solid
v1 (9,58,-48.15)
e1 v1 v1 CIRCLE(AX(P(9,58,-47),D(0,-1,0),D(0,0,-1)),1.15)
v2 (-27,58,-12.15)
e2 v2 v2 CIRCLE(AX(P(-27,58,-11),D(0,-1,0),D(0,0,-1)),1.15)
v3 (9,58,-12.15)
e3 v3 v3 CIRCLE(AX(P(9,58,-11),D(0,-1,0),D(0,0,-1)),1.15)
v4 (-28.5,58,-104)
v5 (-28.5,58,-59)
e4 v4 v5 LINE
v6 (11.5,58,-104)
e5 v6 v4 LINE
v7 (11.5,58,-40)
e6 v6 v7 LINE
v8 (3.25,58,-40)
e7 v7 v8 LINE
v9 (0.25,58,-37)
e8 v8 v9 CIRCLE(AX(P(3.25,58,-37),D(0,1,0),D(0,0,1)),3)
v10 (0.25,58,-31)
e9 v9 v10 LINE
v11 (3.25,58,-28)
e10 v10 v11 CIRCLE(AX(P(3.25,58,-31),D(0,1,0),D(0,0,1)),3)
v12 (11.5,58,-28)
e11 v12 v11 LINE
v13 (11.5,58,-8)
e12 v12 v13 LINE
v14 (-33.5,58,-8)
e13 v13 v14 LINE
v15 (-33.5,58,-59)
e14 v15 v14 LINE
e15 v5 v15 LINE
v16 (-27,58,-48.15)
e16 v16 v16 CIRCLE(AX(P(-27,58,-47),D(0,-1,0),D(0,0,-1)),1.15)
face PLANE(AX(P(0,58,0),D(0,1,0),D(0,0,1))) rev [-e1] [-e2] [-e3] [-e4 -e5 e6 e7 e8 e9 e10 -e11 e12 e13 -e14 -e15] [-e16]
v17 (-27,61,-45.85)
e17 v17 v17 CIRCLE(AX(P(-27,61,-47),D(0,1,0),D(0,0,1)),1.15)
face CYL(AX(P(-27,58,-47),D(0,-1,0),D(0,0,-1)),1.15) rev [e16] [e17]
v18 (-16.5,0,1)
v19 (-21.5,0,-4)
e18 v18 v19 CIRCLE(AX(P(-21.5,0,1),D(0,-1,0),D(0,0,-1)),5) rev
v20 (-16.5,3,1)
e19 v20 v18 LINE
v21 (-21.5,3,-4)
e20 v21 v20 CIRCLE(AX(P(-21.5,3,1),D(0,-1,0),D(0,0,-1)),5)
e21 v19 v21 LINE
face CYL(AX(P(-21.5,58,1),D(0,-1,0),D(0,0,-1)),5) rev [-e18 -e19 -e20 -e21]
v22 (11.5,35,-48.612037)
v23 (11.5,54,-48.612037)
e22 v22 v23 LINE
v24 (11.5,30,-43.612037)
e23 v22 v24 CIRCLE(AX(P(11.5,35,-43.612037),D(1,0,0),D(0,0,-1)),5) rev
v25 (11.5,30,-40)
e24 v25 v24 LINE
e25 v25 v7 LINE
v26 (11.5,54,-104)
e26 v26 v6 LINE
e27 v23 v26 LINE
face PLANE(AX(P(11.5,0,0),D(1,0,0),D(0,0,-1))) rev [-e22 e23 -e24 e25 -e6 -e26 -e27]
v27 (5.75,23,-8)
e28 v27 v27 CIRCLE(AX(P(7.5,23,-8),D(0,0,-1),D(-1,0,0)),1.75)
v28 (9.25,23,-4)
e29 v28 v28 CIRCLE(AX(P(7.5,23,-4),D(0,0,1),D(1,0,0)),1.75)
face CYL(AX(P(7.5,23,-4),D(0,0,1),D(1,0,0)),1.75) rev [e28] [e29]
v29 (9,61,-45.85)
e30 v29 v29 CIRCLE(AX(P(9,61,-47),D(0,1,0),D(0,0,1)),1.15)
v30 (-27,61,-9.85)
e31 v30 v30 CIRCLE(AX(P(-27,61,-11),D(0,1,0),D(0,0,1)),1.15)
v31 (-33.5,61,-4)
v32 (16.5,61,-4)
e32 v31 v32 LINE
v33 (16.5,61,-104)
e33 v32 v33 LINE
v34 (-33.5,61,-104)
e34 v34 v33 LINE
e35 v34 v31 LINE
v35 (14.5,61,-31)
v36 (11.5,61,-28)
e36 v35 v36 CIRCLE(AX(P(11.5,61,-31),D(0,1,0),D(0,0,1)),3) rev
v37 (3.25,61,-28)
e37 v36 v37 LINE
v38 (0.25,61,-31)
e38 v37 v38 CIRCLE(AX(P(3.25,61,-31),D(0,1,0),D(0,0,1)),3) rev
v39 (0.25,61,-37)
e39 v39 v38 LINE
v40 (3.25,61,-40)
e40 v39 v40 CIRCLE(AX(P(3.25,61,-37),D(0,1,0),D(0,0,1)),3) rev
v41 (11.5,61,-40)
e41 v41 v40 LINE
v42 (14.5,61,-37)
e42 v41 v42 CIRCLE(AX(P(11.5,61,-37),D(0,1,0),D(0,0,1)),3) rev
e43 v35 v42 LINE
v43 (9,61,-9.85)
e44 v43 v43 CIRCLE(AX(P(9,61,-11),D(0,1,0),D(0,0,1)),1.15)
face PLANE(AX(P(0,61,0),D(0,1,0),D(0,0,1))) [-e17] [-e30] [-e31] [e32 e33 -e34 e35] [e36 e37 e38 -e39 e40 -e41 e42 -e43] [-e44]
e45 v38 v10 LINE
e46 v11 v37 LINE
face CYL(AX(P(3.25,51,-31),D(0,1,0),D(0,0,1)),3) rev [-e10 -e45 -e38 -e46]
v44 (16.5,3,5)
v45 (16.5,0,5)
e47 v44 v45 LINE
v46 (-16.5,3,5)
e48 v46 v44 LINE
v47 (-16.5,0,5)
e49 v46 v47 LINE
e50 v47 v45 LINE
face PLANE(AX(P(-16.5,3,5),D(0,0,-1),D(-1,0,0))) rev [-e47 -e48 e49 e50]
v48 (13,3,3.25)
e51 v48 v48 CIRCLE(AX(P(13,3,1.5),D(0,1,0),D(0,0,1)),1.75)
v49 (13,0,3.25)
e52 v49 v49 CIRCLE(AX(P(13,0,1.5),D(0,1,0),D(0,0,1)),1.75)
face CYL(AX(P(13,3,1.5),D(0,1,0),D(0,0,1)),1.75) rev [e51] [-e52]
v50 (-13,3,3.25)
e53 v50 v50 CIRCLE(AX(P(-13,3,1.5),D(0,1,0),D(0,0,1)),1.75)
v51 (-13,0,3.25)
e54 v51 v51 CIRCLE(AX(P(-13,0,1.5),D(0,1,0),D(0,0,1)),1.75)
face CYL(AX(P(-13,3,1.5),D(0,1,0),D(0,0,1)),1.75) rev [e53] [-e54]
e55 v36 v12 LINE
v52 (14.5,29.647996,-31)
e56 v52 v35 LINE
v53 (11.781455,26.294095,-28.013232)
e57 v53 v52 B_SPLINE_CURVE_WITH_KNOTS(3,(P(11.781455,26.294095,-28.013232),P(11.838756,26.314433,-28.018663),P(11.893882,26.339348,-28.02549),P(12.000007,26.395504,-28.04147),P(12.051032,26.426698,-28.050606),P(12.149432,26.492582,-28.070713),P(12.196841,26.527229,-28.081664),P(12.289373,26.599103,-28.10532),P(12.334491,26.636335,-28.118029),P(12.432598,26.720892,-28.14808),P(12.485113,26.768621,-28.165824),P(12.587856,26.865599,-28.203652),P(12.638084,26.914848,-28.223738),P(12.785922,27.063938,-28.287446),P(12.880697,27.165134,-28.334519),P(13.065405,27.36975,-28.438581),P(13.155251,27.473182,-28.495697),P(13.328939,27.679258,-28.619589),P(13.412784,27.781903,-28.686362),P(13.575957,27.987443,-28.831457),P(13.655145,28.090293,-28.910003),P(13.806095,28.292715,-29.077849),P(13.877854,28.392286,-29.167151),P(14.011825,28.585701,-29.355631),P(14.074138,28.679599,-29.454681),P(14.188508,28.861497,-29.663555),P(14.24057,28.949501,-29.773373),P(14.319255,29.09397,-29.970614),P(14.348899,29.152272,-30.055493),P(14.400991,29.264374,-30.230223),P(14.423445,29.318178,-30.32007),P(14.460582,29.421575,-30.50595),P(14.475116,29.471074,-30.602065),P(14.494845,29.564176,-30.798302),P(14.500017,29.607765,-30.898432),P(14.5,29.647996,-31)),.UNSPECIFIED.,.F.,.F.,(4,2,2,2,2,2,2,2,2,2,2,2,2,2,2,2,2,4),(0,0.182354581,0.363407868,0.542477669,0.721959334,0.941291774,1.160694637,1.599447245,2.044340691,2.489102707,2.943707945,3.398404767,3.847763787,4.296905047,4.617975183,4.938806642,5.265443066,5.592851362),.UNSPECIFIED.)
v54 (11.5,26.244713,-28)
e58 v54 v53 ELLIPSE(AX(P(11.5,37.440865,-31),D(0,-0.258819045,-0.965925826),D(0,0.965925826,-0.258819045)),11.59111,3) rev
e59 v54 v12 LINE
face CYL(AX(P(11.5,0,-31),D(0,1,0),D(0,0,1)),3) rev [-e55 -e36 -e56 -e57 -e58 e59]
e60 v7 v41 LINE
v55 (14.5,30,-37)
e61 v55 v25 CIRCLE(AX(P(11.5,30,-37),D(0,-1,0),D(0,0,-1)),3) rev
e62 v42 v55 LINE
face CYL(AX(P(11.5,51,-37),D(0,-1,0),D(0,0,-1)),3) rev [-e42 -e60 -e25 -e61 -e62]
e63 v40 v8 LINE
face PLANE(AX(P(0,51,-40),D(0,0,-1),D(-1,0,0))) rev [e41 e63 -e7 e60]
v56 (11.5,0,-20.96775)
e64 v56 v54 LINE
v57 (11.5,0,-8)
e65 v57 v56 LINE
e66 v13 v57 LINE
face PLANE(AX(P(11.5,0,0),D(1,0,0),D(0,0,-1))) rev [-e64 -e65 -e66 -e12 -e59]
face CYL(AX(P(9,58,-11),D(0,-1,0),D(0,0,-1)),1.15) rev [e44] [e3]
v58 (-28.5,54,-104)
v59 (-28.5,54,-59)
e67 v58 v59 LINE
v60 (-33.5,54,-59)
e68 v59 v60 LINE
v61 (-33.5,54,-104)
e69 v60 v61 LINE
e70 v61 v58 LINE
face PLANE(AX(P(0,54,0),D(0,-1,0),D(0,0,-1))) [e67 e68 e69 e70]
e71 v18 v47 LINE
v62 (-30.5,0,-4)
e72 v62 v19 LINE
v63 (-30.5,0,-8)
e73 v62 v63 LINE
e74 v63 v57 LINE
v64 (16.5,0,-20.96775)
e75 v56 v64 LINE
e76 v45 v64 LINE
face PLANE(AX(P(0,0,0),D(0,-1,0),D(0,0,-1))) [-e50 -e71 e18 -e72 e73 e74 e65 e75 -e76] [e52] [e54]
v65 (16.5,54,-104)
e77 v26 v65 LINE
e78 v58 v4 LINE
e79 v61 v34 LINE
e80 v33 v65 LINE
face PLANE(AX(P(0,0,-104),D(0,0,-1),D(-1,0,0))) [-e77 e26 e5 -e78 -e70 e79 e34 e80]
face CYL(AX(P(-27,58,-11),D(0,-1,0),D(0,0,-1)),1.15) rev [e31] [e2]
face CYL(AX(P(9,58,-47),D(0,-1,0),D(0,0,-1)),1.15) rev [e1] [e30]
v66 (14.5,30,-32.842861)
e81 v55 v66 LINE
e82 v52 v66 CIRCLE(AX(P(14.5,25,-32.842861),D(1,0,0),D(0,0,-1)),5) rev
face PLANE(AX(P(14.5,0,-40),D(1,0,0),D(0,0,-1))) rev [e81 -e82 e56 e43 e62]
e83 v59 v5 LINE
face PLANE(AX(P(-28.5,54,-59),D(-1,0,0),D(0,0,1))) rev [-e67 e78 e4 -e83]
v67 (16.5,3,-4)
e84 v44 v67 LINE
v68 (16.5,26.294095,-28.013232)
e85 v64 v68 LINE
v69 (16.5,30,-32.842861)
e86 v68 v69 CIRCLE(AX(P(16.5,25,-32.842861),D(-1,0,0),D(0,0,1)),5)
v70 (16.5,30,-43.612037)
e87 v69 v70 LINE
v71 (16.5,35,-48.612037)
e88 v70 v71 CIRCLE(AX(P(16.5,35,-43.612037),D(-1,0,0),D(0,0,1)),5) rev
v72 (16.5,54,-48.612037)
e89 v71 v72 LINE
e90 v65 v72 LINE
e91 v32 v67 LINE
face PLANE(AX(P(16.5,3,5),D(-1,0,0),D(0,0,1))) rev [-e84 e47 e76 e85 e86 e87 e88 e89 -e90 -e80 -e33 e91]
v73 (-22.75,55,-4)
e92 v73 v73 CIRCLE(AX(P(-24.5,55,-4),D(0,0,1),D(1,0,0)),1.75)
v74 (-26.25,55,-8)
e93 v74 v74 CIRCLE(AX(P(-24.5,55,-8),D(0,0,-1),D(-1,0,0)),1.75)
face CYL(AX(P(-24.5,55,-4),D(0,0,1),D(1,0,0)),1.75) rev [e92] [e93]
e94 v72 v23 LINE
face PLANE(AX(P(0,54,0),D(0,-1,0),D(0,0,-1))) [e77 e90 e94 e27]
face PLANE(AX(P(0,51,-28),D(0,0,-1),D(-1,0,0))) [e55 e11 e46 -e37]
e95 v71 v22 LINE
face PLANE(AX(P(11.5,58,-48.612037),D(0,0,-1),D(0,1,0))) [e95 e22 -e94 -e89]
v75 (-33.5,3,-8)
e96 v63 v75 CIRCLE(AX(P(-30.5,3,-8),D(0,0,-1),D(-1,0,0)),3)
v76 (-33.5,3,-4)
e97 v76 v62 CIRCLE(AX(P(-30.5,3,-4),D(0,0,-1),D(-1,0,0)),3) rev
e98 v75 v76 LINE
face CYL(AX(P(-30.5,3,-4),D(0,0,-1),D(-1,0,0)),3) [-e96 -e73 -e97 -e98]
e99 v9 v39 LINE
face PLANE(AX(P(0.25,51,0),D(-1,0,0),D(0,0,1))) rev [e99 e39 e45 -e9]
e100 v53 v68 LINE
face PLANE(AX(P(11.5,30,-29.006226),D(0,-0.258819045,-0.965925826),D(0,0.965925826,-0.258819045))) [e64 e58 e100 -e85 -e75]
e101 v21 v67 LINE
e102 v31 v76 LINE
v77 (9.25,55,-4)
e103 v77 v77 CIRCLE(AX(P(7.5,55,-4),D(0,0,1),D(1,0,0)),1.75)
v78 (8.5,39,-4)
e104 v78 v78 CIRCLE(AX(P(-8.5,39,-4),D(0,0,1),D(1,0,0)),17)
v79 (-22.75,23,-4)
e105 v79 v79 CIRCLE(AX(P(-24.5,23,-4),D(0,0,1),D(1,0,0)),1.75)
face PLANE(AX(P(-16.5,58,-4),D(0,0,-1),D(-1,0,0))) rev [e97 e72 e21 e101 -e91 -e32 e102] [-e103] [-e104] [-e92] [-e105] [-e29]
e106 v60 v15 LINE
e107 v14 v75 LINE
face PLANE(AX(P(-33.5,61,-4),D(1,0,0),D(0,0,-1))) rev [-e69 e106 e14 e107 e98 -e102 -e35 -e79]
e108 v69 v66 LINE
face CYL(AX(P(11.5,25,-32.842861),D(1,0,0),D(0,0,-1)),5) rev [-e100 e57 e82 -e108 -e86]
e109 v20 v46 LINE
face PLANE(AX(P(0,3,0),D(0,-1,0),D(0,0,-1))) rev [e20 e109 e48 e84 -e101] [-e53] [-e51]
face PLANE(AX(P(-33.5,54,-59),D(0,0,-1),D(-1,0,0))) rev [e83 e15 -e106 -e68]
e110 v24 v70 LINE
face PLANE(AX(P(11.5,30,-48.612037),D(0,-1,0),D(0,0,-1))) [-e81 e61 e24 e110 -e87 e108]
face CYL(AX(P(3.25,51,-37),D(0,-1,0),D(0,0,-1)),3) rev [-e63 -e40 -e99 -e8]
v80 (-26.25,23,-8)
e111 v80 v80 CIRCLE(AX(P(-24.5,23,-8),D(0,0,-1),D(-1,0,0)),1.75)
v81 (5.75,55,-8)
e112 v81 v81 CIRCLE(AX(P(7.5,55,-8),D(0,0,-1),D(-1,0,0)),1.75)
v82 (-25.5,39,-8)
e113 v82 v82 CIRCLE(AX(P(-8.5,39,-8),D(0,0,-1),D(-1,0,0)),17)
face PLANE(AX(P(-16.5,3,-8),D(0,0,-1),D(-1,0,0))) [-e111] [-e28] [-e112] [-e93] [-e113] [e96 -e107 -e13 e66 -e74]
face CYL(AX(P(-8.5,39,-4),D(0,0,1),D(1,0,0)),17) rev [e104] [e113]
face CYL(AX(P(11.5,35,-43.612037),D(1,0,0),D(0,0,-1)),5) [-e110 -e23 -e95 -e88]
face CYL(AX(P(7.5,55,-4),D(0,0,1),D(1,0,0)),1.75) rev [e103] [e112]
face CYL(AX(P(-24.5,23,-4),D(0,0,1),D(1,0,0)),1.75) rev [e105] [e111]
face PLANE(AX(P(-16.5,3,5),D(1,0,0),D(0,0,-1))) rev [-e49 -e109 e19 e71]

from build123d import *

# Parameters (mm, degrees)
SKETCH_1_W          = 33
SKETCH_1_H          = 10
EXTRUDE_1_DEPTH     = 3
HOLE_WIZARD_1_D     = 3.5
SKETCH_5_W          = 33
SKETCH_5_H          = 3
EXTRUDE_2_DEPTH     = 3
SKETCH_6_W          = 33
SKETCH_6_H          = 4
EXTRUDE_3_DEPTH     = 55
SKETCH_7_W          = 50
SKETCH_7_H          = 4
EXTRUDE_4_DEPTH     = 3
SKETCH_8_W          = 50
SKETCH_8_H          = 3
EXTRUDE_5_DEPTH     = 56
EXTRUDE_6_DEPTH     = 5
EXTRUDE_7_DEPTH     = 4
SKETCH_20_W         = 50
SKETCH_20_H         = 3
EXTRUDE_9_DEPTH     = 40
EXTRUDE_15_DEPTH    = 4
EXTRUDE_16_DEPTH    = 4
FILLET_1_R          = 3
HOLE_WIZARD_5_D     = 3.5
HOLE_WIZARD_6_D     = 34
HOLE_WIZARD_7_D     = 2.3
EXTRUDE_17_DEPTH    = 5
SKETCH_49_W         = 44.612037216
SKETCH_49_H         = 28
EXTRUDE_18_DEPTH    = 5
SKETCH_50_W         = 11.25
SKETCH_50_H         = 12
CUT_EXTRUDE_1_DEPTH = 10
EXTRUDE_19_DEPTH    = 5
FILLET_2_R          = 5
SKETCH_52_W         = 3
SKETCH_52_H         = 12
CUT_EXTRUDE_2_DEPTH = 126.136925006
FILLET_3_R          = 3
FILLET_4_R          = 5
SKETCH_53_W         = 5
SKETCH_53_H         = 55.387962784
SKETCH_53_H_2       = 45
EXTRUDE_20_DEPTH    = 4


with BuildPart() as part:
    # 草图1 → 凸台-拉伸1 (new body)
    with BuildSketch(Plane(origin=(0, 0, 0), x_dir=(1, 0, 0), z_dir=(0, 1, 0))):
        Rectangle(SKETCH_1_W, SKETCH_1_H)
    extrude(amount=EXTRUDE_1_DEPTH)

    # 孔1 (through all)
    with Locations(Plane(origin=(0, 3, 0), x_dir=(1, 0, 0), z_dir=(0, 1, 0))):
        with Locations((-13, -1.5), (13, -1.5)):
            Hole(HOLE_WIZARD_1_D / 2)

    # 草图5 → 凸台-拉伸2 (add)
    with BuildSketch(Plane.XZ):
        with Locations((0, -6.5)):
            Rectangle(SKETCH_5_W, SKETCH_5_H)
    extrude(amount=-EXTRUDE_2_DEPTH)

    # 草图6 → 凸台-拉伸3 (add)
    with BuildSketch(Plane(origin=(0, 3, 0), x_dir=(1, 0, 0), z_dir=(0, 1, 0))):
        with Locations((0, 6)):
            Rectangle(SKETCH_6_W, SKETCH_6_H)
    extrude(amount=EXTRUDE_3_DEPTH)

    # 草图7 → 凸台-拉伸4 (add)
    with BuildSketch(Plane(origin=(0, 58, 0), x_dir=(1, 0, 0), z_dir=(0, 1, 0))):
        with Locations((-8.5, 6)):
            Rectangle(SKETCH_7_W, SKETCH_7_H)
    extrude(amount=EXTRUDE_4_DEPTH)

    # 草图8 → 凸台-拉伸5 (add)
    with BuildSketch(Plane(origin=(0, 0, -8), x_dir=(-1, 0, 0), z_dir=(0, 0, -1))):
        with Locations((8.5, 59.5)):
            Rectangle(SKETCH_8_W, SKETCH_8_H)
    extrude(amount=EXTRUDE_5_DEPTH)

    # 草图15 → 凸台-拉伸6 (add)
    with BuildSketch(Plane(origin=(16.5, 0, 0), x_dir=(0, 0, -1), z_dir=(1, 0, 0))):
        Polygon((8, 0), (48.612037216, 58), (42.508164272, 58), (8, 8.717233978), align=None)
    extrude(amount=-EXTRUDE_6_DEPTH)

    # 草图16 → 凸台-拉伸7 (add)
    with BuildSketch(Plane.XY.offset(-4)):
        Polygon((-16.5, 0), (-33.5, 58), (-28.289650608, 58), (-16.5, 17.77648616), align=None)
    extrude(amount=-EXTRUDE_7_DEPTH)

    # 草图20 → 凸台-拉伸9 (add)
    with BuildSketch(Plane(origin=(0, 0, -64), x_dir=(-1, 0, 0), z_dir=(0, 0, -1))):
        with Locations((8.5, 59.5)):
            Rectangle(SKETCH_20_W, SKETCH_20_H)
    extrude(amount=EXTRUDE_9_DEPTH)

    # 草图33 → 凸台-拉伸15 (add)
    with BuildSketch(Plane.XY.offset(-4)):
        Polygon((-28.289650608, 58), (-16.5, 17.77648616), (-16.5, 58), align=None)
    extrude(amount=-EXTRUDE_15_DEPTH)

    # 草图34 → 凸台-拉伸16 (add)
    with BuildSketch(Plane.XY.offset(-4)):
        Polygon((-33.5, 58), (-33.5, 0), (-16.5, 0), align=None)
    extrude(amount=-EXTRUDE_16_DEPTH)

    # 圆角1
    fillet_1_edges = [part.edges().sort_by_distance(p)[0] for p in [
        (-33.5, 0, -6),
    ]]
    fillet(fillet_1_edges, radius=FILLET_1_R)

    # 孔5 (through all)
    with Locations(Plane.XY.offset(-4)):
        with Locations((-24.5, 55), (-24.5, 23), (7.5, 23), (7.5, 55)):
            Hole(HOLE_WIZARD_5_D / 2)

    # 孔6 (through all)
    with Locations(Plane.XY.offset(-4)):
        with Locations((-8.5, 39)):
            Hole(HOLE_WIZARD_6_D / 2)

    # 孔7 (through all)
    with Locations(Plane(origin=(0, 58, 0), x_dir=(-1, 0, 0), z_dir=(0, -1, 0))):
        with Locations((-9, 11), (-9, 47), (27, 47), (27, 11)):
            Hole(HOLE_WIZARD_7_D / 2)

    # 草图48 → 凸台-拉伸17 (add)
    with BuildSketch(Plane(origin=(16.5, 0, 0), x_dir=(0, 0, -1), z_dir=(1, 0, 0))):
        Polygon((8, 8.717233978), (8, 58), (42.508164272, 58), align=None)
    extrude(amount=-EXTRUDE_17_DEPTH)

    # 草图49 → 凸台-拉伸18 (add)
    with BuildSketch(Plane(origin=(16.5, 0, 0), x_dir=(0, 0, -1), z_dir=(1, 0, 0))):
        with Locations((26.306018608, 44)):
            Rectangle(SKETCH_49_W, SKETCH_49_H)
    extrude(amount=-EXTRUDE_18_DEPTH)

    # 草图50 → 切除-拉伸1 (cut)
    with BuildSketch(Plane(origin=(0, 61, 0), x_dir=(1, 0, 0), z_dir=(0, 1, 0))):
        with Locations((5.875, 34)):
            Rectangle(SKETCH_50_W, SKETCH_50_H)
    extrude(amount=-CUT_EXTRUDE_1_DEPTH, mode=Mode.SUBTRACT)

    # 草图51 → 凸台-拉伸19 (add)
    with BuildSketch(Plane(origin=(16.5, 0, 0), x_dir=(0, 0, -1), z_dir=(1, 0, 0))):
        Polygon((29.006226146, 30), (20.967750373, 0), (8, 0), align=None)
    extrude(amount=-EXTRUDE_19_DEPTH)

    # 圆角2
    fillet_2_edges = [part.edges().sort_by_distance(p)[0] for p in [
        (14, 30, -29.006226146),
        (14, 30, -48.612037216),
    ]]
    fillet(fillet_2_edges, radius=FILLET_2_R)

    # 草图52 → 切除-拉伸2 (cut, through all)
    with BuildSketch(Plane(origin=(0, 61, 0), x_dir=(1, 0, 0), z_dir=(0, 1, 0))):
        with Locations((13, 34)):
            Rectangle(SKETCH_52_W, SKETCH_52_H)
    extrude(amount=-CUT_EXTRUDE_2_DEPTH, mode=Mode.SUBTRACT)

    # 圆角3
    fillet_3_edges = [part.edges().sort_by_distance(p)[0] for p in [
        (0.25, 59.5, -28),
        (0.25, 59.5, -40),
        (14.5, 45.5, -40),
        (14.5, 43.622356449, -28),
    ]]
    fillet(fillet_3_edges, radius=FILLET_3_R - 0.0001)  # a hair under: the kernel refuses the full size

    # 圆角4
    fillet_4_edges = [part.edges().sort_by_distance(p)[0] for p in [
        (-16.5, 1.5, -4),
    ]]
    fillet(fillet_4_edges, radius=FILLET_4_R)

    # 草图53 → 凸台-拉伸20 (add)
    with BuildSketch(Plane.XZ.offset(-58)):
        with Locations((14, -76.306018608)):
            Rectangle(SKETCH_53_W, SKETCH_53_H)
        with Locations((-31, -81.5)):
            Rectangle(SKETCH_53_W, SKETCH_53_H_2)
    extrude(amount=EXTRUDE_20_DEPTH)


solid = part.part
